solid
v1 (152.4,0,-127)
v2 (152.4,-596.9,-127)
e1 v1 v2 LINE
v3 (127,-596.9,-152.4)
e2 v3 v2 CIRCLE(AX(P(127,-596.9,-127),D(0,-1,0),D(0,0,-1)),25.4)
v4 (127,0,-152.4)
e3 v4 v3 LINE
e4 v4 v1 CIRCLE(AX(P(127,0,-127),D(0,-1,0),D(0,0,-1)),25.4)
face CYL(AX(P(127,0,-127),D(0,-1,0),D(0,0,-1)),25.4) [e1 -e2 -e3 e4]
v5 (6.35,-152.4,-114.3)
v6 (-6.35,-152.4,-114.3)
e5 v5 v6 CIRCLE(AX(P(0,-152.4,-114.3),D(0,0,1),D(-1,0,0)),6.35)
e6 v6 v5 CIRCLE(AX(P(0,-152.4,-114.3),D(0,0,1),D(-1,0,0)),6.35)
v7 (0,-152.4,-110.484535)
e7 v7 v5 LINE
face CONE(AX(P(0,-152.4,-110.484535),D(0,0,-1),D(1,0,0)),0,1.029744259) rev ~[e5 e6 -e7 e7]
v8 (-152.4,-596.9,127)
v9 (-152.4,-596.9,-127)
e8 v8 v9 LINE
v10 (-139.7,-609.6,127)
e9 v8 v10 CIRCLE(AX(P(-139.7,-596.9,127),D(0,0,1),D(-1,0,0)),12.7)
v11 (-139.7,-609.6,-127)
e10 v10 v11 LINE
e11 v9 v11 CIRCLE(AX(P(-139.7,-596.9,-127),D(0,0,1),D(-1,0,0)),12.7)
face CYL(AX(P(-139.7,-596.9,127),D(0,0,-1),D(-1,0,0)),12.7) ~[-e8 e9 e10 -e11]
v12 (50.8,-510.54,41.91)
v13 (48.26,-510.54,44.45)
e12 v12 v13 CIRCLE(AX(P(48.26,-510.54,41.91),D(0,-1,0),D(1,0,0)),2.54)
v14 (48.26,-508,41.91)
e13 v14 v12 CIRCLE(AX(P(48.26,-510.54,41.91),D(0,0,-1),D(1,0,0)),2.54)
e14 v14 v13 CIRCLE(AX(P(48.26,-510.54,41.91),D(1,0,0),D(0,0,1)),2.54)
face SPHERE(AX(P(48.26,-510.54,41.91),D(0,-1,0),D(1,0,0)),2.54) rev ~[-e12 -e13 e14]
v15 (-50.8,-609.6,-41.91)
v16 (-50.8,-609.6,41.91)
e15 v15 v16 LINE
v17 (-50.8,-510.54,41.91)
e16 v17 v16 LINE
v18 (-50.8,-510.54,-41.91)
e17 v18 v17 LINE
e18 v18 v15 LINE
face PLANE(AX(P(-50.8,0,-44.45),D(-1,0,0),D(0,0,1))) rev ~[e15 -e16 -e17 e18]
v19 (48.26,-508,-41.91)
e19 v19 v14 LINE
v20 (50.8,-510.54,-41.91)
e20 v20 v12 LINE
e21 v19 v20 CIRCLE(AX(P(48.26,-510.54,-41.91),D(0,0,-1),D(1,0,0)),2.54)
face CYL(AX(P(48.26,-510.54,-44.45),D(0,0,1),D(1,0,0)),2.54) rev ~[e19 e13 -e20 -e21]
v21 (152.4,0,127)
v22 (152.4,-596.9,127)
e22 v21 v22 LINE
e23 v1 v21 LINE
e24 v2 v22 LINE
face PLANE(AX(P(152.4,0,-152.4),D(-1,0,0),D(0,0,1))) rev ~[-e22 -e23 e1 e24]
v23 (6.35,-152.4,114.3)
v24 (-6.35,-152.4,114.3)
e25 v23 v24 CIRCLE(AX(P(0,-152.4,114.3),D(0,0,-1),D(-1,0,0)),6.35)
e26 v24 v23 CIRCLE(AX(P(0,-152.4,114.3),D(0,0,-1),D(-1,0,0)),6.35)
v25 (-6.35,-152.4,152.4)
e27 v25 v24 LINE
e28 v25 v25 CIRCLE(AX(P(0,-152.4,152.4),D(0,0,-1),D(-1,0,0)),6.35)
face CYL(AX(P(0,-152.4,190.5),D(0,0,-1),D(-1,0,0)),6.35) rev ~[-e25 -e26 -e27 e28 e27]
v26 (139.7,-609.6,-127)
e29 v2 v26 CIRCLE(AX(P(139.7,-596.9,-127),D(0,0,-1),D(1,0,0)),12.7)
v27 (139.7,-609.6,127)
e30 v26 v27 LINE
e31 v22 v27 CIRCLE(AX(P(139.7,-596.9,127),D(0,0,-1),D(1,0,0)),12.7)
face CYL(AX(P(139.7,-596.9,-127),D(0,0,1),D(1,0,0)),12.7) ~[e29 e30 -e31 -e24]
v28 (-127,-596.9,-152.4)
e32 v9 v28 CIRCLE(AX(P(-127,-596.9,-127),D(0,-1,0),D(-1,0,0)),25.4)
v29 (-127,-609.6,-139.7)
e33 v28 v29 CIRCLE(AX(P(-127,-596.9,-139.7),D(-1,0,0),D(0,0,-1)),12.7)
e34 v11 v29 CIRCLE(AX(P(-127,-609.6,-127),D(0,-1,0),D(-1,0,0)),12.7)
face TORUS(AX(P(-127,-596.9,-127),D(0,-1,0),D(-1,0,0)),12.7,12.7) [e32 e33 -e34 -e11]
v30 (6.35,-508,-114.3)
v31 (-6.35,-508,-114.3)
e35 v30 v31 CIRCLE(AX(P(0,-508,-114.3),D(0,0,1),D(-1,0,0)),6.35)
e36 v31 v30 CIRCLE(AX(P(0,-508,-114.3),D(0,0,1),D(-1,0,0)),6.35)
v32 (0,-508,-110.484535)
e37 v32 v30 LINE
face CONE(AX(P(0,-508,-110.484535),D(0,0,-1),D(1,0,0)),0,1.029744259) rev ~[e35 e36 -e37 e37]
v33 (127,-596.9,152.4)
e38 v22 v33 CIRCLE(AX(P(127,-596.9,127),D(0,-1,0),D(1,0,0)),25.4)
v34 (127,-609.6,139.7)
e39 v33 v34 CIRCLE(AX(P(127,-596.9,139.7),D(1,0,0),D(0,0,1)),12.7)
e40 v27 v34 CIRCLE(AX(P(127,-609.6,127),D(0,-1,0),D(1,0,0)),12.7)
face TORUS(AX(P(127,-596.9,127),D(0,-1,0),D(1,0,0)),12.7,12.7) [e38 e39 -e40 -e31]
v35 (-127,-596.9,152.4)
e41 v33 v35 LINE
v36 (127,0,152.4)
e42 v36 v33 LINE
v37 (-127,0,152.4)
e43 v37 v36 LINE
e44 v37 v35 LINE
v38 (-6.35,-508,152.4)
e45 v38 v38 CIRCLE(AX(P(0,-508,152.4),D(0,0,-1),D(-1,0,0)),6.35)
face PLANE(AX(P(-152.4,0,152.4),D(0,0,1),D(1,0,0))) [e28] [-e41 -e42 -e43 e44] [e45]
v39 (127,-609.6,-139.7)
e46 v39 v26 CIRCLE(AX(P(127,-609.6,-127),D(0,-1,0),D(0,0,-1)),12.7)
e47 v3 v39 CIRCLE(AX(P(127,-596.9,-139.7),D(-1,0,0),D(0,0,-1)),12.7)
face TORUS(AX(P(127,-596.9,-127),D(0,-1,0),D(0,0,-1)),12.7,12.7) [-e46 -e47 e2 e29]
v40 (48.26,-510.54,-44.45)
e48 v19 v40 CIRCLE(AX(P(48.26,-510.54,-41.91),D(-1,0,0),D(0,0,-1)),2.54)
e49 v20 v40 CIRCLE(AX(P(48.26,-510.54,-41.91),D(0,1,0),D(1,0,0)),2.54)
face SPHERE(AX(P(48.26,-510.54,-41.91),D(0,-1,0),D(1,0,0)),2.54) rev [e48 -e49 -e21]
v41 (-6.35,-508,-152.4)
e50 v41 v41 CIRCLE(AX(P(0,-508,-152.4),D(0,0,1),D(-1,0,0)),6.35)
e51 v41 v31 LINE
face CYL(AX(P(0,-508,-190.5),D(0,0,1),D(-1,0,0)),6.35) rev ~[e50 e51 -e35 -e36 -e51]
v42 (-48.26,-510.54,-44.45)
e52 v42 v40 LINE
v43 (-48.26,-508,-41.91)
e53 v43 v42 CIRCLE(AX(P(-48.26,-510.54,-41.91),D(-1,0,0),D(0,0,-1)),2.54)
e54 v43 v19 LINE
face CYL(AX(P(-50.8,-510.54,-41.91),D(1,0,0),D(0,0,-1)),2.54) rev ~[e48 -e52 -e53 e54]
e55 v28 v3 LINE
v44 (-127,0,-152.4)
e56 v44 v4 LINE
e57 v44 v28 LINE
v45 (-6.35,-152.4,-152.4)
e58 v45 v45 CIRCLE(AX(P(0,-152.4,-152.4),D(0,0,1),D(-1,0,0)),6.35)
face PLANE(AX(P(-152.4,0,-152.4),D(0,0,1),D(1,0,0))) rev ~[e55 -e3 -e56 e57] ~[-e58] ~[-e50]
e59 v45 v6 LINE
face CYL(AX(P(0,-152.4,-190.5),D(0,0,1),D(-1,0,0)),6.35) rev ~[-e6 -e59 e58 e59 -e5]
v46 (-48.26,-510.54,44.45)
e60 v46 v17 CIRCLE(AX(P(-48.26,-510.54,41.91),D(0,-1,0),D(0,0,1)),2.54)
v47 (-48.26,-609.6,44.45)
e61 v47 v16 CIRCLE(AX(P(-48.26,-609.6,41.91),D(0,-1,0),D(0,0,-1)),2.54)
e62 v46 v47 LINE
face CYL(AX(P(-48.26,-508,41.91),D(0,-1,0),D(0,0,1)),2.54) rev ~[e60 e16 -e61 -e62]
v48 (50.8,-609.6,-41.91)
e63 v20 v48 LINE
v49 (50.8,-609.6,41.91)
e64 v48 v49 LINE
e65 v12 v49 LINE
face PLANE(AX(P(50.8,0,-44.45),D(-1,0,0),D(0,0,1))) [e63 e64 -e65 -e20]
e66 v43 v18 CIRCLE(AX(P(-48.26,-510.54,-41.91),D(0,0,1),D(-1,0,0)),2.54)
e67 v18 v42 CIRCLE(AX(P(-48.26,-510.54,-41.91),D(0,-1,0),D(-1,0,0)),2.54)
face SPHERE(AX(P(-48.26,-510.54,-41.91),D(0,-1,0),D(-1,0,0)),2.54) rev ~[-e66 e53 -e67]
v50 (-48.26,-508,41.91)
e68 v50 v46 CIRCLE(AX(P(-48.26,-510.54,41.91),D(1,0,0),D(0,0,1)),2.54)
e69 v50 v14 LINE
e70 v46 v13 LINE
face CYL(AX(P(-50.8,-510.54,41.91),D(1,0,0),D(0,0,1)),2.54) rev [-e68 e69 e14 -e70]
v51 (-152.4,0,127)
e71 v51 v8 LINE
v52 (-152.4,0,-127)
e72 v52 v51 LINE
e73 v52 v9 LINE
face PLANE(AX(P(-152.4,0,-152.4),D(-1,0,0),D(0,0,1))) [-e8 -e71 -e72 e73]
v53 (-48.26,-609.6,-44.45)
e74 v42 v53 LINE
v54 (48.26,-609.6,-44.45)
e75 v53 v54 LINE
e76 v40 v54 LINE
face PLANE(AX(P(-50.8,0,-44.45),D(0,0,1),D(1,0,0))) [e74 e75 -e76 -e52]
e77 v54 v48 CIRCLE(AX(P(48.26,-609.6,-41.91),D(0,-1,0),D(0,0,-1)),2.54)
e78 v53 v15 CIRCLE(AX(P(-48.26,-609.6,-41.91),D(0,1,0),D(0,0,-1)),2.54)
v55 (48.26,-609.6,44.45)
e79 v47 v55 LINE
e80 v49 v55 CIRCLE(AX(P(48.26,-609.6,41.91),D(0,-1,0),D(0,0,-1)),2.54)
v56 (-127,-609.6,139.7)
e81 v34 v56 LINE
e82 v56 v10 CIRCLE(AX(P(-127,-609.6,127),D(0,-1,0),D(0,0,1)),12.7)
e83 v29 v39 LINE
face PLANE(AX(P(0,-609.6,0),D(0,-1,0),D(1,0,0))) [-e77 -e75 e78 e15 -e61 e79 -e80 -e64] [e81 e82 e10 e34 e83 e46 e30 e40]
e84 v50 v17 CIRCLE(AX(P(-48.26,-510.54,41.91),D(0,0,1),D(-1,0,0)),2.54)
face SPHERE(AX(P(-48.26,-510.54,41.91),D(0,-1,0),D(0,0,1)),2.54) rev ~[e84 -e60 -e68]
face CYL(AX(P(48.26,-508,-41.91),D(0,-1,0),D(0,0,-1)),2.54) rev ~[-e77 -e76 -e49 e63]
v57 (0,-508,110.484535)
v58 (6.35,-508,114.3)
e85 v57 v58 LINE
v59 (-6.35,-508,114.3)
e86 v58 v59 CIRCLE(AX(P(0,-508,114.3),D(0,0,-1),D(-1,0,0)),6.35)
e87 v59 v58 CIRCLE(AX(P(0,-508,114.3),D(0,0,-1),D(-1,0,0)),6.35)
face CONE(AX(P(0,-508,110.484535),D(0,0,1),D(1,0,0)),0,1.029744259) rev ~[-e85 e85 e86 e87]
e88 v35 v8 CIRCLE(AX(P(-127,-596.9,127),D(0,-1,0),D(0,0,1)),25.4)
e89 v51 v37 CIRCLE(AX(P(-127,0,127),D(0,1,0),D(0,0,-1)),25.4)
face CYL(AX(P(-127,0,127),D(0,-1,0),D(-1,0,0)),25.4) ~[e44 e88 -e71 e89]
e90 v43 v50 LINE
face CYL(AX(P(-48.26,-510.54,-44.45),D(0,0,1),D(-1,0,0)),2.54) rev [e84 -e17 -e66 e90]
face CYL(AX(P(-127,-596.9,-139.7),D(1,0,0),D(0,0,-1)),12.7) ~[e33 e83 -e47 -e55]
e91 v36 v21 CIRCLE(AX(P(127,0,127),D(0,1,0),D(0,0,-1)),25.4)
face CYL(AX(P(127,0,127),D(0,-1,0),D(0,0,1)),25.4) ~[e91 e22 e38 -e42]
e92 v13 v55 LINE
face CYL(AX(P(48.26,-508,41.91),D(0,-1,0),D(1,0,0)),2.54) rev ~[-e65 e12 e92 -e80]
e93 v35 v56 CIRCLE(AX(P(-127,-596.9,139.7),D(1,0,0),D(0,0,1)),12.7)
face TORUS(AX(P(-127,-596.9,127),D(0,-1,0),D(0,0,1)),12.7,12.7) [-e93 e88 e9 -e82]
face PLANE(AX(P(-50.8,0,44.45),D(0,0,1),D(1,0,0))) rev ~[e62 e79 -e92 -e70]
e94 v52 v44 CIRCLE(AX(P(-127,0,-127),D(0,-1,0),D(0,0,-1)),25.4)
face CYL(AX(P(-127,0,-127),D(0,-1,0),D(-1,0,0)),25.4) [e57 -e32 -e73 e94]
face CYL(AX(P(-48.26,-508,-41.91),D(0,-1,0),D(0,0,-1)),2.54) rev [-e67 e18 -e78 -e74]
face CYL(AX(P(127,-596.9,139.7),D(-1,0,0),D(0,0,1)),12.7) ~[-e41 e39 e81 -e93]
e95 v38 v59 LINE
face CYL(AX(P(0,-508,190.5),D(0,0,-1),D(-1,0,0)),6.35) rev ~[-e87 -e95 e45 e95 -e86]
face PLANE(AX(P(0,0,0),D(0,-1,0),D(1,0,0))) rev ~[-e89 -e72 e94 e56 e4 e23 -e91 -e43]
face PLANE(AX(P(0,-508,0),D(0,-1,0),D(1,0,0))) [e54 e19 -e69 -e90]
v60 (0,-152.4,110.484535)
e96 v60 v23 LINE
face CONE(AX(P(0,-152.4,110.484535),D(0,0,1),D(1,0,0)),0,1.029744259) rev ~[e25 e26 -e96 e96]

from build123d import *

# Parameters (mm, degrees)
F0_W     = 304.8
F0_H     = 304.8
F0_W_2   = 101.6
F0_H_2   = 88.9
F1_DEPTH = 609.6
F8_DEPTH = 508
F2_R     = 25.4
F3_R     = 12.7
F4_D     = 12.7
F4_DEPTH = 38.1
F4_TIP   = 3.8154649308
F6_D     = 12.7
F6_DEPTH = 38.1
F6_TIP   = 3.8154649308
F7_R     = 2.54


# Not quite as in the source:
# - a feature names something its author has since deleted; it is built from what else it names


with BuildPart() as f1:
    # F0 (on Front) → F1 (new body)
    with BuildSketch(Plane.XZ):
        Rectangle(F0_W, F0_H)
        Rectangle(F0_W_2, F0_H_2, mode=Mode.SUBTRACT)
    extrude(amount=F1_DEPTH)

    # F0 (on Front) → F8 (join)
    with BuildSketch(Plane.XZ):
        Rectangle(F0_W_2, F0_H_2)
    extrude(amount=F8_DEPTH)

    # F2
    f2_edges = [f1.edges().sort_by_distance(p)[0] for p in [
        (152.4, -304.8, -152.4),
        (-152.4, -304.8, -152.4),
        (-152.4, -304.8, 152.4),
        (152.4, -304.8, 152.4),
    ]]
    fillet(f2_edges, radius=F2_R)

    # F3
    f3_edges = [f1.edges().sort_by_distance(p)[0] for p in [
        (152.4, -609.6, 0),
    ]]
    fillet(f3_edges, radius=F3_R)

    # F4
    with Locations(Plane(origin=(0, 0, -152.4), x_dir=(1, 0, 0), z_dir=(0, 0, -1))):
        with Locations((0, 152.4), (0, 508)):
            Hole(F4_D / 2, depth=F4_DEPTH)
            with Locations((0, 0, -(F4_DEPTH + F4_TIP / 2))):  # 118° drill point
                Cone(0, F4_D / 2, F4_TIP, mode=Mode.SUBTRACT)

    # F6
    with Locations(Plane.XY.offset(152.4)):
        with Locations((0, -508), (0, -152.4)):
            Hole(F6_D / 2, depth=F6_DEPTH)
            with Locations((0, 0, -(F6_DEPTH + F6_TIP / 2))):  # 118° drill point
                Cone(0, F6_D / 2, F6_TIP, mode=Mode.SUBTRACT)

    # F7
    f7_edges = [f1.edges().sort_by_distance(p)[0] for p in [
        (-50.8, -558.8, -44.45),
        (-50.8, -558.8, 44.45),
        (50.8, -558.8, 44.45),
        (50.8, -558.8, -44.45),
        (50.8, -508, 0),
        (0, -508, 44.45),
        (-50.8, -508, 0),
        (0, -508, -44.45),
    ]]
    fillet(f7_edges, radius=F7_R)


solid = f1.part
